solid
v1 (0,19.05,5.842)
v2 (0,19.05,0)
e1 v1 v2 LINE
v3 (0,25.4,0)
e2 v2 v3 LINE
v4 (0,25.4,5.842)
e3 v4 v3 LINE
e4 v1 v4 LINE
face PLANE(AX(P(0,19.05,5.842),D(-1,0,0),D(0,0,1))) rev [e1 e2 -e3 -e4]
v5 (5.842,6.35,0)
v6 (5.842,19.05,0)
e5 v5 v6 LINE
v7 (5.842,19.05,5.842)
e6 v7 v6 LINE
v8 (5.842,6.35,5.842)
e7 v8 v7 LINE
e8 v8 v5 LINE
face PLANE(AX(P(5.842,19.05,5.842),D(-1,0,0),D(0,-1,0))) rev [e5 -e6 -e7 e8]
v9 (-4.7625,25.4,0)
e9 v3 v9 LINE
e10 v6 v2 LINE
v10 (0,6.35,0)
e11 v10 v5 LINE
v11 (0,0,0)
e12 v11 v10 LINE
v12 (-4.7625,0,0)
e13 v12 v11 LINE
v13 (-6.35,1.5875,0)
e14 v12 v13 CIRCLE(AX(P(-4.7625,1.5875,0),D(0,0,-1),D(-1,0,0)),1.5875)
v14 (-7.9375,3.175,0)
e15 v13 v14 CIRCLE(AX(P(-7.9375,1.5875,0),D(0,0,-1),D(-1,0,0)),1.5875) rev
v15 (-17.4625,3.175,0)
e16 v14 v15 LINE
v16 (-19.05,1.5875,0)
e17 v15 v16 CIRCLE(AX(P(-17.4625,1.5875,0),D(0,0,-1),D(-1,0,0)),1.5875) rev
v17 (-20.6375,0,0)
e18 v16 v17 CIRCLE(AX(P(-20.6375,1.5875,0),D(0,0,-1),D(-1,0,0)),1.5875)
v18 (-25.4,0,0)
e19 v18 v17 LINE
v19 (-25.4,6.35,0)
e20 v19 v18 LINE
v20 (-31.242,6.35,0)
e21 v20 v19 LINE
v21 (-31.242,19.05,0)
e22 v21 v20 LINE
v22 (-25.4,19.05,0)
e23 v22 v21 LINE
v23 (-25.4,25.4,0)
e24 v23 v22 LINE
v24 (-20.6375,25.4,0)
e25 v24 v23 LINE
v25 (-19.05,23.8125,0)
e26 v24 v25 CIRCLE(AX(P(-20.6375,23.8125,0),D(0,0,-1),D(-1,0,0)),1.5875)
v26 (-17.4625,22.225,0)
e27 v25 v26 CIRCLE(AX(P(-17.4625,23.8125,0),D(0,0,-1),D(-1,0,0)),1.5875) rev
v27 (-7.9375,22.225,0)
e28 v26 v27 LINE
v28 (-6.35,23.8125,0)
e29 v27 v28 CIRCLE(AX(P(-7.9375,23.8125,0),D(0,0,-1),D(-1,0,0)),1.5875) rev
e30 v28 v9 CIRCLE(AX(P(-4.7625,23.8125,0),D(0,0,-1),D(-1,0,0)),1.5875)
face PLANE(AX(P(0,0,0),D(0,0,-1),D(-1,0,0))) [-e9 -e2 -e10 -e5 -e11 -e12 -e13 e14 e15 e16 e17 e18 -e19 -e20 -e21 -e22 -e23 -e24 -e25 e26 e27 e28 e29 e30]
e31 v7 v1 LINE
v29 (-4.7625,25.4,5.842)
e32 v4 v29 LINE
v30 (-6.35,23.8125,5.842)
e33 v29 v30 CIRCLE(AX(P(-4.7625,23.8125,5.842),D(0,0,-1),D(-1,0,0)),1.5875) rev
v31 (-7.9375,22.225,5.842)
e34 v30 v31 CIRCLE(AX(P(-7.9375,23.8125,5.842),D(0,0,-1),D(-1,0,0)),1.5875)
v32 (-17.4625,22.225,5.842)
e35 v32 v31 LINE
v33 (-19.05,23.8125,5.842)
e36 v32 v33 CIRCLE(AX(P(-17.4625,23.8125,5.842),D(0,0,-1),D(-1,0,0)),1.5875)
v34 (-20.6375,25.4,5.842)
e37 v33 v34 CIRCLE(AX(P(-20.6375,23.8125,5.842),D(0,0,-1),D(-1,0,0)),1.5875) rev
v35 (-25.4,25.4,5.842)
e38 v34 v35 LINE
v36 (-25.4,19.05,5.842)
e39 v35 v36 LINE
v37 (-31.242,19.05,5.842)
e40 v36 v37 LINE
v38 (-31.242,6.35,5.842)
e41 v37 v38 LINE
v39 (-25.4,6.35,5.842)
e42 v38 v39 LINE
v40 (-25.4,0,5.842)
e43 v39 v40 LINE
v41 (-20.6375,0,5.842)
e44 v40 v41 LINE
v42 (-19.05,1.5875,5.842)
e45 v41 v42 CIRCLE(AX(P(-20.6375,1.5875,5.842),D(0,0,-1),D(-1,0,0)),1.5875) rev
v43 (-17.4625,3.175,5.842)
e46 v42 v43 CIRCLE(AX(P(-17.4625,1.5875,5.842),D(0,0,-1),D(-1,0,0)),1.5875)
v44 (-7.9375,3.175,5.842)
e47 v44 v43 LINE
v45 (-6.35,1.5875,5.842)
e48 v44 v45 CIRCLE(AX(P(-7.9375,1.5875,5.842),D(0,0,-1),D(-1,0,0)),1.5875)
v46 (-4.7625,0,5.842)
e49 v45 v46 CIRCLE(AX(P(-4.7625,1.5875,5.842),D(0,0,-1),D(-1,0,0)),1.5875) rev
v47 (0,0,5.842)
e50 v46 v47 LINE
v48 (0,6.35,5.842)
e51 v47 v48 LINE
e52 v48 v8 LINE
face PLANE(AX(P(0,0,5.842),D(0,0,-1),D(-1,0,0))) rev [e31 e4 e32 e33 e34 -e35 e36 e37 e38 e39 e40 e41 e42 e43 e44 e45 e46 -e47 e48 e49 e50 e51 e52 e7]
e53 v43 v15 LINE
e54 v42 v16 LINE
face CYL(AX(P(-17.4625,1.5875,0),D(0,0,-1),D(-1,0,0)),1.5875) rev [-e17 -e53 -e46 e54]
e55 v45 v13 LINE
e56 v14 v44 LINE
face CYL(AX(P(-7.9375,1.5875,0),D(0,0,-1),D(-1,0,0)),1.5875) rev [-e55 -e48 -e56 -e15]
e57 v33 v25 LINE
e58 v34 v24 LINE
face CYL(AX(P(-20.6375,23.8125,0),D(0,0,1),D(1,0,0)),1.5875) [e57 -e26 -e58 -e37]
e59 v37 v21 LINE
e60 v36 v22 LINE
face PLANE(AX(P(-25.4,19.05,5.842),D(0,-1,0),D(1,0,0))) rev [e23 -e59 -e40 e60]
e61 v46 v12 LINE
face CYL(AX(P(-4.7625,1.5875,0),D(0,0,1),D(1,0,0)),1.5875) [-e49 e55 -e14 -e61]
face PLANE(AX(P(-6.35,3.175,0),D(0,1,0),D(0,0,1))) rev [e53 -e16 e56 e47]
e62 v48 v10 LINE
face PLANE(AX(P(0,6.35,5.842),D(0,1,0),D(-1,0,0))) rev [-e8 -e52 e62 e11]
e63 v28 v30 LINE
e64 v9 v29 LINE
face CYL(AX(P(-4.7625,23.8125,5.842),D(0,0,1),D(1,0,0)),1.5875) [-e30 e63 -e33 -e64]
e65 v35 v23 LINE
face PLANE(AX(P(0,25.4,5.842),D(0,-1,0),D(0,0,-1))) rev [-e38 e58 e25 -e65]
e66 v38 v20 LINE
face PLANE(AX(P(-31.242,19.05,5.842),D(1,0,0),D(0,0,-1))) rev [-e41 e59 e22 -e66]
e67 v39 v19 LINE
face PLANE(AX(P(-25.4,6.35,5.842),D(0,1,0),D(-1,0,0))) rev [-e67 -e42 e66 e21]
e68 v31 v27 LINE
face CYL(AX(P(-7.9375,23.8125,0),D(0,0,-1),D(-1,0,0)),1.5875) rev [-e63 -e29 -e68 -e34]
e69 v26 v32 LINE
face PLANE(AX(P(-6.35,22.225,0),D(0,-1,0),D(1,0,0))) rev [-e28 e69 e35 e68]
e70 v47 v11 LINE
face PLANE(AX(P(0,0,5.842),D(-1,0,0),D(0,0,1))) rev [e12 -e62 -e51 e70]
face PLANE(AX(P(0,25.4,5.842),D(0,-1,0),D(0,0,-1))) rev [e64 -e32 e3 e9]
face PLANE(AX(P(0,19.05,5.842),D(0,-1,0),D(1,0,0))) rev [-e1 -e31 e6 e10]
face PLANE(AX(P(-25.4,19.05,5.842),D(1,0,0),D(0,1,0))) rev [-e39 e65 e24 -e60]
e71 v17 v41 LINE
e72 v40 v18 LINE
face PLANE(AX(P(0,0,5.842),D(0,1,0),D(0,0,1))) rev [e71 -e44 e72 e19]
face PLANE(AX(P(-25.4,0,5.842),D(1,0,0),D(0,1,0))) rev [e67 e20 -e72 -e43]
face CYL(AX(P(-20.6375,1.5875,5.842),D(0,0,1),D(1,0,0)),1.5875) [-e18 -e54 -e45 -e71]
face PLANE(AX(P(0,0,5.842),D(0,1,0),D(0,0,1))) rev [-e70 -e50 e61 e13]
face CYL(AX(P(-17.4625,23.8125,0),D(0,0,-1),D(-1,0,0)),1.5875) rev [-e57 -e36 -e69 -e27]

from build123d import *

# Parameters (mm, degrees)
BOSS_EXTRUDE1_DEPTH = 5.842
SKETCH2_W           = 12.7
SKETCH2_H           = 3.175
CUT_EXTRUDE1_DEPTH  = 41.686011454
FILLET1_START       = -1
FILLET1_DEPTH       = 8
FILLET1_2_DEPTH     = 5.842


with BuildPart() as part:
    # Sketch1 → Boss-Extrude1 (new body)
    with BuildSketch(Plane.XY):
        Polygon((0, 0), (-25.4, 0), (-25.4, 6.35), (-31.242, 6.35), (-31.242, 19.05), (-25.4, 19.05), (-25.4, 25.4), (0, 25.4), (0, 19.05), (5.842, 19.05), (5.842, 6.35), (0, 6.35), align=None)
    extrude(amount=BOSS_EXTRUDE1_DEPTH)

    # Sketch2 → Cut-Extrude1 (cut, through all)
    with BuildSketch(Plane.XY.offset(5.842)):
        with Locations((-12.7, 23.8125)):
            Rectangle(SKETCH2_W, SKETCH2_H)
        with Locations((-12.7, 1.5875)):
            Rectangle(SKETCH2_W, SKETCH2_H)
    extrude(amount=-CUT_EXTRUDE1_DEPTH, mode=Mode.SUBTRACT)

    # Fillet1: read off the stored shape, not the designer's step
    # Fillet1 outline → Fillet1 (cut)
    with BuildSketch(Plane.XY.offset(FILLET1_START)):
        with BuildLine():
            ThreePointArc((-20.6375, 25.4), (-19.514967985, 24.935032015), (-19.05, 23.8125))
            Line((-19.05, 23.8125), (-19.05, 25.4))
            Line((-19.05, 25.4), (-20.6375, 25.4))
        make_face()
        with BuildLine():
            Line((-6.35, 25.4), (-6.35, 23.8125))
            ThreePointArc((-6.35, 23.8125), (-5.885032015, 24.935032015), (-4.7625, 25.4))
            Line((-4.7625, 25.4), (-6.35, 25.4))
        make_face()
        with BuildLine():
            ThreePointArc((-4.7625, 0), (-5.885032015, 0.464967985), (-6.35, 1.5875))
            Line((-6.35, 1.5875), (-6.35, 0))
            Line((-6.35, 0), (-4.7625, 0))
        make_face()
        with BuildLine():
            Line((-19.05, 0), (-19.05, 1.5875))
            ThreePointArc((-19.05, 1.5875), (-19.514967985, 0.464967985), (-20.6375, 0))
            Line((-20.6375, 0), (-19.05, 0))
        make_face()
    extrude(amount=FILLET1_DEPTH, mode=Mode.SUBTRACT)

    # Fillet1 2 outline → Fillet1 2 (add)
    with BuildSketch(Plane.XY):
        with BuildLine():
            Line((-19.05, 22.225), (-17.4625, 22.225))
            ThreePointArc((-17.4625, 22.225), (-18.585032015, 22.689967985), (-19.05, 23.8125))
            Line((-19.05, 23.8125), (-19.05, 22.225))
        make_face()
        with BuildLine():
            ThreePointArc((-6.35, 23.8125), (-6.814967985, 22.689967985), (-7.9375, 22.225))
            Line((-7.9375, 22.225), (-6.35, 22.225))
            Line((-6.35, 22.225), (-6.35, 23.8125))
        make_face()
        with BuildLine():
            Line((-6.35, 3.175), (-7.9375, 3.175))
            ThreePointArc((-7.9375, 3.175), (-6.814967985, 2.710032015), (-6.35, 1.5875))
            Line((-6.35, 1.5875), (-6.35, 3.175))
        make_face()
        with BuildLine():
            ThreePointArc((-19.05, 1.5875), (-18.585032015, 2.710032015), (-17.4625, 3.175))
            Line((-17.4625, 3.175), (-19.05, 3.175))
            Line((-19.05, 3.175), (-19.05, 1.5875))
        make_face()
    extrude(amount=FILLET1_2_DEPTH)


solid = part.part
